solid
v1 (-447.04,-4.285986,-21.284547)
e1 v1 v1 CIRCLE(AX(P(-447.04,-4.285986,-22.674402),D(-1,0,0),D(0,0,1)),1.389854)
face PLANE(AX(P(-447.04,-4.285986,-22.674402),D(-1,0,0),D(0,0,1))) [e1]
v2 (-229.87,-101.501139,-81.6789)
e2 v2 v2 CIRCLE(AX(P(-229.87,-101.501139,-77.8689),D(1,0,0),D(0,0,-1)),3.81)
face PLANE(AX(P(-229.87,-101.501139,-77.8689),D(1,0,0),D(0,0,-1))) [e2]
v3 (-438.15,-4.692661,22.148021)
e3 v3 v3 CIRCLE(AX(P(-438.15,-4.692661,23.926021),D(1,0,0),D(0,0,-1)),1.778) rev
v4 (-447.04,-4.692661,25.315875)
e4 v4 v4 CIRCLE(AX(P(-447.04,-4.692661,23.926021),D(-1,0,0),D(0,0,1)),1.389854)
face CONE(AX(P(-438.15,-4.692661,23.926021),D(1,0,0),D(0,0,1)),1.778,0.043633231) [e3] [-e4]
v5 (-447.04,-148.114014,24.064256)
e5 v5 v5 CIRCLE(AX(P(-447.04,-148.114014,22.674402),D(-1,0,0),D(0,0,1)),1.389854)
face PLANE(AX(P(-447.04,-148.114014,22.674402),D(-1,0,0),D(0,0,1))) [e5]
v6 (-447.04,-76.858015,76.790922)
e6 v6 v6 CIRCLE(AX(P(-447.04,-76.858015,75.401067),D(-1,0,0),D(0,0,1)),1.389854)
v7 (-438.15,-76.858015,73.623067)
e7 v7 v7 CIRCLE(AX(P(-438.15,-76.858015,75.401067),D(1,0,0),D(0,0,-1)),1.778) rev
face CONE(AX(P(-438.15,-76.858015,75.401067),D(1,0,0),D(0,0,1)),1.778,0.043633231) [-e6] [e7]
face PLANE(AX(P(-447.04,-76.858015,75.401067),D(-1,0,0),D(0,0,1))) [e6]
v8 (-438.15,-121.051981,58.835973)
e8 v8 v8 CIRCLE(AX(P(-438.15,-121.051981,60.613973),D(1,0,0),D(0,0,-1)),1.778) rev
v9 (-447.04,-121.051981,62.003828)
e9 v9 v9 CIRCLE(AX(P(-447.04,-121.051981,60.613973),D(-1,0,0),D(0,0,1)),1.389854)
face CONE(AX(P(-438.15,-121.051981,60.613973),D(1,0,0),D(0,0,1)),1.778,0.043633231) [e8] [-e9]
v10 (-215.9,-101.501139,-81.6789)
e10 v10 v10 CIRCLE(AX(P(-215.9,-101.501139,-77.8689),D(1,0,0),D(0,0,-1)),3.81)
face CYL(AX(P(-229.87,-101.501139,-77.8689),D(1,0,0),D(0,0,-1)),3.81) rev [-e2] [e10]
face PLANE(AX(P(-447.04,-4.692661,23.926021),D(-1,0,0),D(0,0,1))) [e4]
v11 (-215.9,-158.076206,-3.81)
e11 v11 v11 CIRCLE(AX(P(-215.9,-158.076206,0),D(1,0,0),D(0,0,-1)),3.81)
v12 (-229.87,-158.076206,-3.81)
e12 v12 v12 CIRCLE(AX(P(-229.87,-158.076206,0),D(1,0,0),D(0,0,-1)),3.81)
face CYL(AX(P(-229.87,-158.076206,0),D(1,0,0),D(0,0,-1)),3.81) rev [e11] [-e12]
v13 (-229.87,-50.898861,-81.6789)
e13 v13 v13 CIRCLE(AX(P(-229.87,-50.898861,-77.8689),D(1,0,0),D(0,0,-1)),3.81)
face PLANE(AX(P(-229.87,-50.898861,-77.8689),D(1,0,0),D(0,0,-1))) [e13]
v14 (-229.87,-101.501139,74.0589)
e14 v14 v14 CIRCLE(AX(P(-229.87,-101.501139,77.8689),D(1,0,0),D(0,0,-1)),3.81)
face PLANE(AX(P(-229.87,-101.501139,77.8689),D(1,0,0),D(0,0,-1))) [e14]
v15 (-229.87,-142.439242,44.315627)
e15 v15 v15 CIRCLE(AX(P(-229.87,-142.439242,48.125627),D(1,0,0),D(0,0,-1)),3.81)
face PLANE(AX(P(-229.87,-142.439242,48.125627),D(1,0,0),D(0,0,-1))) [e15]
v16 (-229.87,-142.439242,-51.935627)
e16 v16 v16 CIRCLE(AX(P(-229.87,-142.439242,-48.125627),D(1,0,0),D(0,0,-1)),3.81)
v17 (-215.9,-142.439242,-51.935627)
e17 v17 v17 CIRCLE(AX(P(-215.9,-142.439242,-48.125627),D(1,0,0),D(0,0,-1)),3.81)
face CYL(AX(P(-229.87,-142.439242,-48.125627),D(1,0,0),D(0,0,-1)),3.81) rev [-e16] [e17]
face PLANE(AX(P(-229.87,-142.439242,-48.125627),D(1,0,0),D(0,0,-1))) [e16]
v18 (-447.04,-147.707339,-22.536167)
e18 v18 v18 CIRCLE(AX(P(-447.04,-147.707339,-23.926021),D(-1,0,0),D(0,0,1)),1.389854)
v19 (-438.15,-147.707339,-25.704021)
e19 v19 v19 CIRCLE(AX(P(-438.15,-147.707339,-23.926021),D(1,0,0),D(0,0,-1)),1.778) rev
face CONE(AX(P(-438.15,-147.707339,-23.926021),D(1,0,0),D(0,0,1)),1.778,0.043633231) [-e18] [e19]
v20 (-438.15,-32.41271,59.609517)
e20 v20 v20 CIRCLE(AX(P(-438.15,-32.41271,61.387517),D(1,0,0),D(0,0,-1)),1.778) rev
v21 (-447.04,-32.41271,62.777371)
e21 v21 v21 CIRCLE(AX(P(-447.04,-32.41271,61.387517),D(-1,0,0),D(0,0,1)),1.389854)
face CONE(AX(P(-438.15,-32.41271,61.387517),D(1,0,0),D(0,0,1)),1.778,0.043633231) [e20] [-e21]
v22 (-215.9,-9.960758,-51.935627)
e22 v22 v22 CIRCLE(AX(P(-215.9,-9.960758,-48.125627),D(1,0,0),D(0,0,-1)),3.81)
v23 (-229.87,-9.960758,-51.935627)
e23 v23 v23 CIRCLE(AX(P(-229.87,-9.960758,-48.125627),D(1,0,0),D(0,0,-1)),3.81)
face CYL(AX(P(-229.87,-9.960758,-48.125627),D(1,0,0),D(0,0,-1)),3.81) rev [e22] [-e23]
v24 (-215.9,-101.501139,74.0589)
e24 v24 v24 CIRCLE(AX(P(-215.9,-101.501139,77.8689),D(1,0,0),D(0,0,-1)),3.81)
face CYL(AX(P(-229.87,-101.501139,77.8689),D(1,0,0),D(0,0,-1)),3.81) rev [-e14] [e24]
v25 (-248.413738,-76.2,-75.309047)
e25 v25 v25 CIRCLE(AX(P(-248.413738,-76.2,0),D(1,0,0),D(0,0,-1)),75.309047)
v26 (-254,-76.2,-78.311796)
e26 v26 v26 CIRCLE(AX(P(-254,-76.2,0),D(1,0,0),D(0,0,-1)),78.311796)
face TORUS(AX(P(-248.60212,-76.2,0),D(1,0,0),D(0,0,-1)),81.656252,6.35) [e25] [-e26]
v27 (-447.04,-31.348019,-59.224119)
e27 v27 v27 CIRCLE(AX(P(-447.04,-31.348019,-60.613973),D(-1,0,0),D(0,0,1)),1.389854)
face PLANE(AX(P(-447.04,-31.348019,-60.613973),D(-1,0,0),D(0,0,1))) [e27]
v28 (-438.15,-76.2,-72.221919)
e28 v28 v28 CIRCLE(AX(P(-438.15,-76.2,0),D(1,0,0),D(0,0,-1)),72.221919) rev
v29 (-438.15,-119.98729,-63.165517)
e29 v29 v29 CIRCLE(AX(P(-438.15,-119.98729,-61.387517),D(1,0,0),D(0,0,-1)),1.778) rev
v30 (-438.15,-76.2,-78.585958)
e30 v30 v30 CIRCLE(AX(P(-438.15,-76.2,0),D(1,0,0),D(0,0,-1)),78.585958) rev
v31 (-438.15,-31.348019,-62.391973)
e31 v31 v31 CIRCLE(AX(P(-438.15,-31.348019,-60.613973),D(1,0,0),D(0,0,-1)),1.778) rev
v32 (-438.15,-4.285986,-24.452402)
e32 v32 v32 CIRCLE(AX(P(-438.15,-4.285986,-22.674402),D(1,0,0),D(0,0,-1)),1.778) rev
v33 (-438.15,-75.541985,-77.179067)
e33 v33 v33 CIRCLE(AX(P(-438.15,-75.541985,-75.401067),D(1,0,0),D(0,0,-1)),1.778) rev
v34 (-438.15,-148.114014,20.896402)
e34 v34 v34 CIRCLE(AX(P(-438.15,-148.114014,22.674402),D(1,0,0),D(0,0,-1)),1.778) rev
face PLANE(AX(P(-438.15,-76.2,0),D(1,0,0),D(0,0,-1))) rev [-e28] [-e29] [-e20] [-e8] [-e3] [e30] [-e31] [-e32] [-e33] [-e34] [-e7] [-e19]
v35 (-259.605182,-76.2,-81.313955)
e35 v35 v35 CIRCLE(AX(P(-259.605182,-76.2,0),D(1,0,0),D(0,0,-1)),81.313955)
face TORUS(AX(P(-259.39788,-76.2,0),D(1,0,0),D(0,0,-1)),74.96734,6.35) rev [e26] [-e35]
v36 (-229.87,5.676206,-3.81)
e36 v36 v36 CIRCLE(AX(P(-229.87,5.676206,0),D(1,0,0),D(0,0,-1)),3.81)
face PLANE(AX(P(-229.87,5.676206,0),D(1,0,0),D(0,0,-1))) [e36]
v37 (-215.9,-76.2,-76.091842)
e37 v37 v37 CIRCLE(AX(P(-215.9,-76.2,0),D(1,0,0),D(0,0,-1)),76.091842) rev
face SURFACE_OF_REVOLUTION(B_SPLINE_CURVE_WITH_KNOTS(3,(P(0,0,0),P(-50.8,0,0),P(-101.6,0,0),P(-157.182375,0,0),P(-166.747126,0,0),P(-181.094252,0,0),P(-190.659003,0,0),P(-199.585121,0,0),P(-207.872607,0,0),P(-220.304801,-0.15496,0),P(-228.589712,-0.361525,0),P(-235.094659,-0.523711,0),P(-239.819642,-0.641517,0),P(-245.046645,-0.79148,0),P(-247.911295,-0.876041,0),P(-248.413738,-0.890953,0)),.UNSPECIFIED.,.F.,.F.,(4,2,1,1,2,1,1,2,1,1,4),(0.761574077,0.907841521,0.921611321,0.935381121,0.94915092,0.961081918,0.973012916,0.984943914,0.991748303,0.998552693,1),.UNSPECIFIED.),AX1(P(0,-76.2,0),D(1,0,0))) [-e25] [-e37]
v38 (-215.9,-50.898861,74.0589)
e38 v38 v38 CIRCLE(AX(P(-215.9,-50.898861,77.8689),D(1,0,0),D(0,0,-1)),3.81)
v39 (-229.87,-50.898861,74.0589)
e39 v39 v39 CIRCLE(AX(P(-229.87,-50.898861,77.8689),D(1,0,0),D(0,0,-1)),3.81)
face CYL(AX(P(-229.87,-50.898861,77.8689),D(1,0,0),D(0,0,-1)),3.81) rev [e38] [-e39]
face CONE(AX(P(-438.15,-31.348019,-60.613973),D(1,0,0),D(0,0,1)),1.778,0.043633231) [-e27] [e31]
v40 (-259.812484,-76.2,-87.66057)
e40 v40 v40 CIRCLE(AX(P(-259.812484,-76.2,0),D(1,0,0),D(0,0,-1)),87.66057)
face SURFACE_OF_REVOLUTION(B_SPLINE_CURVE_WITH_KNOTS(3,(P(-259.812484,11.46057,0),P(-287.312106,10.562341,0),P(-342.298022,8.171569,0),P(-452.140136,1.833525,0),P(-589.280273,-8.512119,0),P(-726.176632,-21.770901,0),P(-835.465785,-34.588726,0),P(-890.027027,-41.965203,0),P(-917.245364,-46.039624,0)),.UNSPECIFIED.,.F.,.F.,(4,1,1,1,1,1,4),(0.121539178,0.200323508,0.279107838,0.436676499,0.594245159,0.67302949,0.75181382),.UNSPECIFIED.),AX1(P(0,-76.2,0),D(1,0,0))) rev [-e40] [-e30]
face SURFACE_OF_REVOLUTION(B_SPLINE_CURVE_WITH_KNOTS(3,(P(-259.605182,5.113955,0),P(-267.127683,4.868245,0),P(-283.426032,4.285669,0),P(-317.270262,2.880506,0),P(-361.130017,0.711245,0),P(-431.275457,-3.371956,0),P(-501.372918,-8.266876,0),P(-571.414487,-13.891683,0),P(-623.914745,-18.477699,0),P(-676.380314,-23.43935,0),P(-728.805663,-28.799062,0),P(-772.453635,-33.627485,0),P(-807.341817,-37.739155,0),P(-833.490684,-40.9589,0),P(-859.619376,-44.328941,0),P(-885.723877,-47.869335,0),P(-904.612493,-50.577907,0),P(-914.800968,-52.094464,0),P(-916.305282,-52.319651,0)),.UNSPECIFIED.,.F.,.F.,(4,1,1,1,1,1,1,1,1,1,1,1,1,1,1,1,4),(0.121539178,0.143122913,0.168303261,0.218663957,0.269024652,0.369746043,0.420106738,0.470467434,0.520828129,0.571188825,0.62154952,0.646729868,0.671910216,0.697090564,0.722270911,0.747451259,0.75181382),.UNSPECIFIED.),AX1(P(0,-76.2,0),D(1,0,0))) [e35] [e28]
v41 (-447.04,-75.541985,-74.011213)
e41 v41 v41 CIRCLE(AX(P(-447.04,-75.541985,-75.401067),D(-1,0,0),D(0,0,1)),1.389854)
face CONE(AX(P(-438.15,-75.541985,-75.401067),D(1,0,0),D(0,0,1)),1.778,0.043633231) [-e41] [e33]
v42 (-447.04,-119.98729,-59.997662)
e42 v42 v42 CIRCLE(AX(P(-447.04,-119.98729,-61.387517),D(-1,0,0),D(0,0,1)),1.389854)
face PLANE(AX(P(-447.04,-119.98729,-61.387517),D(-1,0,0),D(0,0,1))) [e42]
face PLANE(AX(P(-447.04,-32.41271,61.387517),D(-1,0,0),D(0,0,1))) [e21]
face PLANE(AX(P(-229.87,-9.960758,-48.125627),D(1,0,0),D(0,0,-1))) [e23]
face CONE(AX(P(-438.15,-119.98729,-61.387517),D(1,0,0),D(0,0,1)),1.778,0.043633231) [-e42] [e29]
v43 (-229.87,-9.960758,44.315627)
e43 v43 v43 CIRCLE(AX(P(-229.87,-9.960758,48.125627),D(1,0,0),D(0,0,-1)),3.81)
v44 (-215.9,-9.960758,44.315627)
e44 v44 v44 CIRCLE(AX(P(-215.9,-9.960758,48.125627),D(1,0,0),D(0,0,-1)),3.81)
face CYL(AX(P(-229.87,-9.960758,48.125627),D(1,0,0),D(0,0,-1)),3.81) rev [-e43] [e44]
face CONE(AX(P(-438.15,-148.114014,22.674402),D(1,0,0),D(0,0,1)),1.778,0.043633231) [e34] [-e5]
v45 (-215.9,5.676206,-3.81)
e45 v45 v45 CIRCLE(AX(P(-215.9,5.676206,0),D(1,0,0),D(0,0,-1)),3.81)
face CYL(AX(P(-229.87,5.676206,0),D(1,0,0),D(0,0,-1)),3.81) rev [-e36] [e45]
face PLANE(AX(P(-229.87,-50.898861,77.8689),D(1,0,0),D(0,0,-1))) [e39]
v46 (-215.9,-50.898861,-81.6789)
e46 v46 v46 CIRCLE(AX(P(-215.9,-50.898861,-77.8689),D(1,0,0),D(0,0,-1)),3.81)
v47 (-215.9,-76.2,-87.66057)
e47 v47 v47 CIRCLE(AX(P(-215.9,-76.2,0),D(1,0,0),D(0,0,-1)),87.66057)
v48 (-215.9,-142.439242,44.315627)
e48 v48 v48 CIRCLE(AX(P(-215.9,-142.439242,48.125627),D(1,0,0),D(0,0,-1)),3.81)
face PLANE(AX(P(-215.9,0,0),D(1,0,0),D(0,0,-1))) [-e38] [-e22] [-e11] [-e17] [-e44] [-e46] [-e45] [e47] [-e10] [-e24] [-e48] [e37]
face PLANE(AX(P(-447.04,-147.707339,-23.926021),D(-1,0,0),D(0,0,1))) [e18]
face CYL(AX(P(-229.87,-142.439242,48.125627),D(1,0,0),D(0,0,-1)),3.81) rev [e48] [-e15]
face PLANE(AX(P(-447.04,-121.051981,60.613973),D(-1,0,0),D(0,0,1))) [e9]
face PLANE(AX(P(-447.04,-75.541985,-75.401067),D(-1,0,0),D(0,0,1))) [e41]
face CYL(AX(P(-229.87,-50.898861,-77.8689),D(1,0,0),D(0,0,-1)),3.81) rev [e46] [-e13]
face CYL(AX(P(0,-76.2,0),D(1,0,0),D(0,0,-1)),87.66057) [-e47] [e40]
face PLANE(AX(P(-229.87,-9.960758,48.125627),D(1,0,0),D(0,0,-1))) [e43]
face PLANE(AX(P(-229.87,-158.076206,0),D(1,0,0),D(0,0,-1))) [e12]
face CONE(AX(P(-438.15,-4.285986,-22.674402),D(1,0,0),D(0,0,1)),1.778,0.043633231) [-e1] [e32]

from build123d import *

# Parameters (mm, degrees)
SKETCH2_R                      = 110.114743718
CUT_EXTRUDE1_DEPTH             = 737.012183471
SKETCH5_R                      = 128.800081892
CUT_EXTRUDE2_DEPTH             = 524.976683945
SKETCH6_R                      = 3.81
CUT_EXTRUDE3_DEPTH             = 13.97
SKETCH7_R                      = 1.778
BOSS_EXTRUDE2_DEPTH            = 8.89
BOSS_EXTRUDE2_DRAFT            = 2.5
BOSS_EXTRUDE2_PROFILE_2_DEPTH  = 8.89
BOSS_EXTRUDE2_PROFILE_2_DRAFT  = 2.5
BOSS_EXTRUDE2_PROFILE_3_DEPTH  = 8.89
BOSS_EXTRUDE2_PROFILE_3_DRAFT  = 2.5
BOSS_EXTRUDE2_PROFILE_4_DEPTH  = 8.89
BOSS_EXTRUDE2_PROFILE_4_DRAFT  = 2.5
BOSS_EXTRUDE2_PROFILE_5_DEPTH  = 8.89
BOSS_EXTRUDE2_PROFILE_5_DRAFT  = 2.5
BOSS_EXTRUDE2_PROFILE_6_DEPTH  = 8.89
BOSS_EXTRUDE2_PROFILE_6_DRAFT  = 2.5
BOSS_EXTRUDE2_PROFILE_7_DEPTH  = 8.89
BOSS_EXTRUDE2_PROFILE_7_DRAFT  = 2.5
BOSS_EXTRUDE2_PROFILE_8_DEPTH  = 8.89
BOSS_EXTRUDE2_PROFILE_8_DRAFT  = 2.5
BOSS_EXTRUDE2_PROFILE_9_DEPTH  = 8.89
BOSS_EXTRUDE2_PROFILE_9_DRAFT  = 2.5
BOSS_EXTRUDE2_PROFILE_10_DEPTH = 8.89
BOSS_EXTRUDE2_PROFILE_10_DRAFT = 2.5


with BuildPart() as part:
    # Sketch1 → Revolve1 (revolve)
    with BuildSketch(Plane.XY):
        with BuildLine():
            Line((6.35, 11.460570284), (-259.812483715, 11.460570284))
            add(Edge.make_bspline(
                [(-259.812483715, 11.460570284), (-287.31210638, 10.562340852), (-342.298022137, 8.171569009), (-452.140135716, 1.833524736), (-589.280273052, -8.512118808), (-726.176632388, -21.770900754), (-835.465785428, -34.58872614), (-890.027026607, -41.965202762), (-917.245364413, -46.039623622)],
                knots=[0.121539178, 0.121539178, 0.121539178, 0.121539178, 0.200323508, 0.279107838, 0.436676499, 0.594245159, 0.67302949, 0.75181382, 0.75181382, 0.75181382, 0.75181382], degree=3))
            ThreePointArc((-917.245364413, -46.039623622), (-924.987260279, -50.310773033), (-928.0652, -58.599678629))
            Line((-928.0652, -58.599678629), (-921.7152, -58.599678629))
            ThreePointArc((-921.7152, -58.599678629), (-920.17623014, -54.455225831), (-916.305282206, -52.319651125))
            add(Edge.make_bspline(
                [(-259.605182082, 5.113954963), (-267.127682546, 4.868244998), (-283.42603151, 4.285669281), (-317.270262329, 2.880505646), (-361.130016616, 0.711244662), (-431.275457269, -3.371956494), (-501.372917975, -8.266876273), (-571.414486843, -13.891682648), (-623.914744737, -18.477698889), (-676.380314027, -23.439349795), (-728.80566324, -28.799062072), (-772.453634614, -33.627485173), (-807.34181653, -37.739154543), (-833.490683911, -40.958900147), (-859.619375692, -44.328941115), (-885.723877265, -47.869335132), (-904.612492975, -50.577906922), (-914.800968172, -52.094464395), (-916.305282206, -52.319651125)],
                knots=[0.121539178, 0.121539178, 0.121539178, 0.121539178, 0.143122913, 0.168303261, 0.218663957, 0.269024652, 0.369746043, 0.420106738, 0.470467434, 0.520828129, 0.571188825, 0.62154952, 0.646729868, 0.671910216, 0.697090564, 0.722270911, 0.747451259, 0.75181382, 0.75181382, 0.75181382, 0.75181382], degree=3))
            ThreePointArc((-259.605182082, 5.113954963), (-256.399753184, 4.364993874), (-254, 2.11179575))
            ThreePointArc((-254, 2.11179575), (-251.60858665, -0.136927523), (-248.413737762, -0.890953221))
            add(Edge.make_bspline(
                [(0, 0), (-50.8, 0), (-101.6, 0), (-157.182375328, 0), (-166.747125983, 0), (-181.094251966, 0), (-190.659002621, 0), (-199.585120865, 0), (-207.872606698, 0), (-220.304800851, -0.154959839), (-228.589711976, -0.361524821), (-235.094659099, -0.523710542), (-239.819642219, -0.641517002), (-245.046645359, -0.791480258), (-247.911294959, -0.876040976), (-248.413737762, -0.890953221)],
                knots=[0.761574077, 0.761574077, 0.761574077, 0.761574077, 0.907841521, 0.907841521, 0.921611321, 0.935381121, 0.94915092, 0.94915092, 0.961081918, 0.973012916, 0.984943914, 0.984943914, 0.991748303, 0.998552693, 1, 1, 1, 1], degree=3))
            Line((0, 0), (6.35, 0))
            Line((6.35, 0), (6.35, 11.460570284))
        make_face()
    revolve(axis=Axis((0, -76.2, 0), (-1, 0, 0)))

    # Sketch2 → Cut-Extrude1 (cut, through all)
    with BuildSketch(Plane(origin=(-215.9, 0, 0), x_dir=(0, 0, -1), z_dir=(1, 0, 0))):
        with Locations((0, -76.2)):
            Circle(SKETCH2_R)
    extrude(amount=CUT_EXTRUDE1_DEPTH, mode=Mode.SUBTRACT)

    # Sketch5 → Cut-Extrude2 (cut, through all)
    with BuildSketch(Plane(origin=(-438.15, 0, 0), x_dir=(0, 0, -1), z_dir=(1, 0, 0))):
        with Locations((0, -76.2)):
            Circle(SKETCH5_R)
    extrude(amount=-CUT_EXTRUDE2_DEPTH, mode=Mode.SUBTRACT)

    # Sketch6 → Cut-Extrude3 (cut)
    with BuildSketch(Plane(origin=(-215.9, 0, 0), x_dir=(0, 0, -1), z_dir=(1, 0, 0))):
        with Locations((0, 5.676206313)):
            Circle(SKETCH6_R)
        with Locations((48.125626585, -9.960757658)):
            Circle(SKETCH6_R)
        with Locations((77.868899544, -50.898860814)):
            Circle(SKETCH6_R)
        with Locations((77.868899544, -101.501139186)):
            Circle(SKETCH6_R)
        with Locations((48.125626585, -142.439242342)):
            Circle(SKETCH6_R)
        with Locations((0, -158.076206313)):
            Circle(SKETCH6_R)
        with Locations((-48.125626585, -142.439242342)):
            Circle(SKETCH6_R)
        with Locations((-77.868899544, -101.501139186)):
            Circle(SKETCH6_R)
        with Locations((-77.868899544, -50.898860814)):
            Circle(SKETCH6_R)
        with Locations((-48.125626585, -9.960757658)):
            Circle(SKETCH6_R)
    extrude(amount=-CUT_EXTRUDE3_DEPTH, mode=Mode.SUBTRACT)


with BuildPart() as boss_extrude2_tool:
    # Sketch7 → Boss-Extrude2 (with draft: the straight prism first)
    with BuildSketch(Plane.ZY.offset(438.15)):
        with Locations((23.926020811, -4.692661383)):
            Circle(SKETCH7_R)
    extrude(amount=BOSS_EXTRUDE2_DEPTH)
    # Boss-Extrude2: the draft: its side faces are tilted about the plane it starts from
    boss_extrude2_sides = [boss_extrude2_tool.faces().sort_by_distance(p)[0] for p in [
        (-442.595, -4.692661383, 22.148020811),
    ]]
    draft(boss_extrude2_sides, Plane.ZY.offset(438.15), BOSS_EXTRUDE2_DRAFT)


with BuildPart() as part_1:
    add(part.part)

    # Boss-Extrude2: add boss_extrude2_tool
    add(boss_extrude2_tool.part)


with BuildPart() as boss_extrude2_profile_2_tool:
    # Sketch7 → Boss-Extrude2 profile 2 (with draft: the straight prism first)
    with BuildSketch(Plane.ZY.offset(438.15)):
        with Locations((61.387516514, -32.412710015)):
            Circle(SKETCH7_R)
    extrude(amount=BOSS_EXTRUDE2_PROFILE_2_DEPTH)
    # Boss-Extrude2 profile 2: the draft: its side faces are tilted about the plane it starts from
    boss_extrude2_profile_2_sides = [boss_extrude2_profile_2_tool.faces().sort_by_distance(p)[0] for p in [
        (-442.595, -32.412710015, 59.609516514),
    ]]
    draft(boss_extrude2_profile_2_sides, Plane.ZY.offset(438.15), BOSS_EXTRUDE2_PROFILE_2_DRAFT)


with BuildPart() as part_2:
    add(part_1.part)

    # Boss-Extrude2 profile 2: add boss_extrude2_profile_2_tool
    add(boss_extrude2_profile_2_tool.part)


with BuildPart() as boss_extrude2_profile_3_tool:
    # Sketch7 → Boss-Extrude2 profile 3 (with draft: the straight prism first)
    with BuildSketch(Plane.ZY.offset(438.15)):
        with Locations((75.401067393, -76.858015146)):
            Circle(SKETCH7_R)
    extrude(amount=BOSS_EXTRUDE2_PROFILE_3_DEPTH)
    # Boss-Extrude2 profile 3: the draft: its side faces are tilted about the plane it starts from
    boss_extrude2_profile_3_sides = [boss_extrude2_profile_3_tool.faces().sort_by_distance(p)[0] for p in [
        (-442.595, -76.858015146, 73.623067393),
    ]]
    draft(boss_extrude2_profile_3_sides, Plane.ZY.offset(438.15), BOSS_EXTRUDE2_PROFILE_3_DRAFT)


with BuildPart() as part_3:
    add(part_2.part)

    # Boss-Extrude2 profile 3: add boss_extrude2_profile_3_tool
    add(boss_extrude2_profile_3_tool.part)


with BuildPart() as boss_extrude2_profile_4_tool:
    # Sketch7 → Boss-Extrude2 profile 4 (with draft: the straight prism first)
    with BuildSketch(Plane.ZY.offset(438.15)):
        with Locations((60.613973316, -121.051980857)):
            Circle(SKETCH7_R)
    extrude(amount=BOSS_EXTRUDE2_PROFILE_4_DEPTH)
    # Boss-Extrude2 profile 4: the draft: its side faces are tilted about the plane it starts from
    boss_extrude2_profile_4_sides = [boss_extrude2_profile_4_tool.faces().sort_by_distance(p)[0] for p in [
        (-442.595, -121.051980857, 58.835973316),
    ]]
    draft(boss_extrude2_profile_4_sides, Plane.ZY.offset(438.15), BOSS_EXTRUDE2_PROFILE_4_DRAFT)


with BuildPart() as part_4:
    add(part_3.part)

    # Boss-Extrude2 profile 4: add boss_extrude2_profile_4_tool
    add(boss_extrude2_profile_4_tool.part)


with BuildPart() as boss_extrude2_profile_5_tool:
    # Sketch7 → Boss-Extrude2 profile 5 (with draft: the straight prism first)
    with BuildSketch(Plane.ZY.offset(438.15)):
        with Locations((22.674401626, -148.114014343)):
            Circle(SKETCH7_R)
    extrude(amount=BOSS_EXTRUDE2_PROFILE_5_DEPTH)
    # Boss-Extrude2 profile 5: the draft: its side faces are tilted about the plane it starts from
    boss_extrude2_profile_5_sides = [boss_extrude2_profile_5_tool.faces().sort_by_distance(p)[0] for p in [
        (-442.595, -148.114014343, 20.896401626),
    ]]
    draft(boss_extrude2_profile_5_sides, Plane.ZY.offset(438.15), BOSS_EXTRUDE2_PROFILE_5_DRAFT)


with BuildPart() as part_5:
    add(part_4.part)

    # Boss-Extrude2 profile 5: add boss_extrude2_profile_5_tool
    add(boss_extrude2_profile_5_tool.part)


with BuildPart() as boss_extrude2_profile_6_tool:
    # Sketch7 → Boss-Extrude2 profile 6 (with draft: the straight prism first)
    with BuildSketch(Plane.ZY.offset(438.15)):
        with Locations((-23.926020811, -147.707338617)):
            Circle(SKETCH7_R)
    extrude(amount=BOSS_EXTRUDE2_PROFILE_6_DEPTH)
    # Boss-Extrude2 profile 6: the draft: its side faces are tilted about the plane it starts from
    boss_extrude2_profile_6_sides = [boss_extrude2_profile_6_tool.faces().sort_by_distance(p)[0] for p in [
        (-442.595, -147.707338617, -25.704020811),
    ]]
    draft(boss_extrude2_profile_6_sides, Plane.ZY.offset(438.15), BOSS_EXTRUDE2_PROFILE_6_DRAFT)


with BuildPart() as part_6:
    add(part_5.part)

    # Boss-Extrude2 profile 6: add boss_extrude2_profile_6_tool
    add(boss_extrude2_profile_6_tool.part)


with BuildPart() as boss_extrude2_profile_7_tool:
    # Sketch7 → Boss-Extrude2 profile 7 (with draft: the straight prism first)
    with BuildSketch(Plane.ZY.offset(438.15)):
        with Locations((-61.387516514, -119.987289985)):
            Circle(SKETCH7_R)
    extrude(amount=BOSS_EXTRUDE2_PROFILE_7_DEPTH)
    # Boss-Extrude2 profile 7: the draft: its side faces are tilted about the plane it starts from
    boss_extrude2_profile_7_sides = [boss_extrude2_profile_7_tool.faces().sort_by_distance(p)[0] for p in [
        (-442.595, -119.987289985, -63.165516514),
    ]]
    draft(boss_extrude2_profile_7_sides, Plane.ZY.offset(438.15), BOSS_EXTRUDE2_PROFILE_7_DRAFT)


with BuildPart() as part_7:
    add(part_6.part)

    # Boss-Extrude2 profile 7: add boss_extrude2_profile_7_tool
    add(boss_extrude2_profile_7_tool.part)


with BuildPart() as boss_extrude2_profile_8_tool:
    # Sketch7 → Boss-Extrude2 profile 8 (with draft: the straight prism first)
    with BuildSketch(Plane.ZY.offset(438.15)):
        with Locations((-75.401067393, -75.541984854)):
            Circle(SKETCH7_R)
    extrude(amount=BOSS_EXTRUDE2_PROFILE_8_DEPTH)
    # Boss-Extrude2 profile 8: the draft: its side faces are tilted about the plane it starts from
    boss_extrude2_profile_8_sides = [boss_extrude2_profile_8_tool.faces().sort_by_distance(p)[0] for p in [
        (-442.595, -75.541984854, -77.179067393),
    ]]
    draft(boss_extrude2_profile_8_sides, Plane.ZY.offset(438.15), BOSS_EXTRUDE2_PROFILE_8_DRAFT)


with BuildPart() as part_8:
    add(part_7.part)

    # Boss-Extrude2 profile 8: add boss_extrude2_profile_8_tool
    add(boss_extrude2_profile_8_tool.part)


with BuildPart() as boss_extrude2_profile_9_tool:
    # Sketch7 → Boss-Extrude2 profile 9 (with draft: the straight prism first)
    with BuildSketch(Plane.ZY.offset(438.15)):
        with Locations((-60.613973316, -31.348019143)):
            Circle(SKETCH7_R)
    extrude(amount=BOSS_EXTRUDE2_PROFILE_9_DEPTH)
    # Boss-Extrude2 profile 9: the draft: its side faces are tilted about the plane it starts from
    boss_extrude2_profile_9_sides = [boss_extrude2_profile_9_tool.faces().sort_by_distance(p)[0] for p in [
        (-442.595, -31.348019143, -62.391973316),
    ]]
    draft(boss_extrude2_profile_9_sides, Plane.ZY.offset(438.15), BOSS_EXTRUDE2_PROFILE_9_DRAFT)


with BuildPart() as part_9:
    add(part_8.part)

    # Boss-Extrude2 profile 9: add boss_extrude2_profile_9_tool
    add(boss_extrude2_profile_9_tool.part)


with BuildPart() as boss_extrude2_profile_10_tool:
    # Sketch7 → Boss-Extrude2 profile 10 (with draft: the straight prism first)
    with BuildSketch(Plane.ZY.offset(438.15)):
        with Locations((-22.674401626, -4.285985657)):
            Circle(SKETCH7_R)
    extrude(amount=BOSS_EXTRUDE2_PROFILE_10_DEPTH)
    # Boss-Extrude2 profile 10: the draft: its side faces are tilted about the plane it starts from
    boss_extrude2_profile_10_sides = [boss_extrude2_profile_10_tool.faces().sort_by_distance(p)[0] for p in [
        (-442.595, -4.285985657, -24.452401626),
    ]]
    draft(boss_extrude2_profile_10_sides, Plane.ZY.offset(438.15), BOSS_EXTRUDE2_PROFILE_10_DRAFT)


with BuildPart() as part_10:
    add(part_9.part)

    # Boss-Extrude2 profile 10: add boss_extrude2_profile_10_tool
    add(boss_extrude2_profile_10_tool.part)


solid = part_10.part
